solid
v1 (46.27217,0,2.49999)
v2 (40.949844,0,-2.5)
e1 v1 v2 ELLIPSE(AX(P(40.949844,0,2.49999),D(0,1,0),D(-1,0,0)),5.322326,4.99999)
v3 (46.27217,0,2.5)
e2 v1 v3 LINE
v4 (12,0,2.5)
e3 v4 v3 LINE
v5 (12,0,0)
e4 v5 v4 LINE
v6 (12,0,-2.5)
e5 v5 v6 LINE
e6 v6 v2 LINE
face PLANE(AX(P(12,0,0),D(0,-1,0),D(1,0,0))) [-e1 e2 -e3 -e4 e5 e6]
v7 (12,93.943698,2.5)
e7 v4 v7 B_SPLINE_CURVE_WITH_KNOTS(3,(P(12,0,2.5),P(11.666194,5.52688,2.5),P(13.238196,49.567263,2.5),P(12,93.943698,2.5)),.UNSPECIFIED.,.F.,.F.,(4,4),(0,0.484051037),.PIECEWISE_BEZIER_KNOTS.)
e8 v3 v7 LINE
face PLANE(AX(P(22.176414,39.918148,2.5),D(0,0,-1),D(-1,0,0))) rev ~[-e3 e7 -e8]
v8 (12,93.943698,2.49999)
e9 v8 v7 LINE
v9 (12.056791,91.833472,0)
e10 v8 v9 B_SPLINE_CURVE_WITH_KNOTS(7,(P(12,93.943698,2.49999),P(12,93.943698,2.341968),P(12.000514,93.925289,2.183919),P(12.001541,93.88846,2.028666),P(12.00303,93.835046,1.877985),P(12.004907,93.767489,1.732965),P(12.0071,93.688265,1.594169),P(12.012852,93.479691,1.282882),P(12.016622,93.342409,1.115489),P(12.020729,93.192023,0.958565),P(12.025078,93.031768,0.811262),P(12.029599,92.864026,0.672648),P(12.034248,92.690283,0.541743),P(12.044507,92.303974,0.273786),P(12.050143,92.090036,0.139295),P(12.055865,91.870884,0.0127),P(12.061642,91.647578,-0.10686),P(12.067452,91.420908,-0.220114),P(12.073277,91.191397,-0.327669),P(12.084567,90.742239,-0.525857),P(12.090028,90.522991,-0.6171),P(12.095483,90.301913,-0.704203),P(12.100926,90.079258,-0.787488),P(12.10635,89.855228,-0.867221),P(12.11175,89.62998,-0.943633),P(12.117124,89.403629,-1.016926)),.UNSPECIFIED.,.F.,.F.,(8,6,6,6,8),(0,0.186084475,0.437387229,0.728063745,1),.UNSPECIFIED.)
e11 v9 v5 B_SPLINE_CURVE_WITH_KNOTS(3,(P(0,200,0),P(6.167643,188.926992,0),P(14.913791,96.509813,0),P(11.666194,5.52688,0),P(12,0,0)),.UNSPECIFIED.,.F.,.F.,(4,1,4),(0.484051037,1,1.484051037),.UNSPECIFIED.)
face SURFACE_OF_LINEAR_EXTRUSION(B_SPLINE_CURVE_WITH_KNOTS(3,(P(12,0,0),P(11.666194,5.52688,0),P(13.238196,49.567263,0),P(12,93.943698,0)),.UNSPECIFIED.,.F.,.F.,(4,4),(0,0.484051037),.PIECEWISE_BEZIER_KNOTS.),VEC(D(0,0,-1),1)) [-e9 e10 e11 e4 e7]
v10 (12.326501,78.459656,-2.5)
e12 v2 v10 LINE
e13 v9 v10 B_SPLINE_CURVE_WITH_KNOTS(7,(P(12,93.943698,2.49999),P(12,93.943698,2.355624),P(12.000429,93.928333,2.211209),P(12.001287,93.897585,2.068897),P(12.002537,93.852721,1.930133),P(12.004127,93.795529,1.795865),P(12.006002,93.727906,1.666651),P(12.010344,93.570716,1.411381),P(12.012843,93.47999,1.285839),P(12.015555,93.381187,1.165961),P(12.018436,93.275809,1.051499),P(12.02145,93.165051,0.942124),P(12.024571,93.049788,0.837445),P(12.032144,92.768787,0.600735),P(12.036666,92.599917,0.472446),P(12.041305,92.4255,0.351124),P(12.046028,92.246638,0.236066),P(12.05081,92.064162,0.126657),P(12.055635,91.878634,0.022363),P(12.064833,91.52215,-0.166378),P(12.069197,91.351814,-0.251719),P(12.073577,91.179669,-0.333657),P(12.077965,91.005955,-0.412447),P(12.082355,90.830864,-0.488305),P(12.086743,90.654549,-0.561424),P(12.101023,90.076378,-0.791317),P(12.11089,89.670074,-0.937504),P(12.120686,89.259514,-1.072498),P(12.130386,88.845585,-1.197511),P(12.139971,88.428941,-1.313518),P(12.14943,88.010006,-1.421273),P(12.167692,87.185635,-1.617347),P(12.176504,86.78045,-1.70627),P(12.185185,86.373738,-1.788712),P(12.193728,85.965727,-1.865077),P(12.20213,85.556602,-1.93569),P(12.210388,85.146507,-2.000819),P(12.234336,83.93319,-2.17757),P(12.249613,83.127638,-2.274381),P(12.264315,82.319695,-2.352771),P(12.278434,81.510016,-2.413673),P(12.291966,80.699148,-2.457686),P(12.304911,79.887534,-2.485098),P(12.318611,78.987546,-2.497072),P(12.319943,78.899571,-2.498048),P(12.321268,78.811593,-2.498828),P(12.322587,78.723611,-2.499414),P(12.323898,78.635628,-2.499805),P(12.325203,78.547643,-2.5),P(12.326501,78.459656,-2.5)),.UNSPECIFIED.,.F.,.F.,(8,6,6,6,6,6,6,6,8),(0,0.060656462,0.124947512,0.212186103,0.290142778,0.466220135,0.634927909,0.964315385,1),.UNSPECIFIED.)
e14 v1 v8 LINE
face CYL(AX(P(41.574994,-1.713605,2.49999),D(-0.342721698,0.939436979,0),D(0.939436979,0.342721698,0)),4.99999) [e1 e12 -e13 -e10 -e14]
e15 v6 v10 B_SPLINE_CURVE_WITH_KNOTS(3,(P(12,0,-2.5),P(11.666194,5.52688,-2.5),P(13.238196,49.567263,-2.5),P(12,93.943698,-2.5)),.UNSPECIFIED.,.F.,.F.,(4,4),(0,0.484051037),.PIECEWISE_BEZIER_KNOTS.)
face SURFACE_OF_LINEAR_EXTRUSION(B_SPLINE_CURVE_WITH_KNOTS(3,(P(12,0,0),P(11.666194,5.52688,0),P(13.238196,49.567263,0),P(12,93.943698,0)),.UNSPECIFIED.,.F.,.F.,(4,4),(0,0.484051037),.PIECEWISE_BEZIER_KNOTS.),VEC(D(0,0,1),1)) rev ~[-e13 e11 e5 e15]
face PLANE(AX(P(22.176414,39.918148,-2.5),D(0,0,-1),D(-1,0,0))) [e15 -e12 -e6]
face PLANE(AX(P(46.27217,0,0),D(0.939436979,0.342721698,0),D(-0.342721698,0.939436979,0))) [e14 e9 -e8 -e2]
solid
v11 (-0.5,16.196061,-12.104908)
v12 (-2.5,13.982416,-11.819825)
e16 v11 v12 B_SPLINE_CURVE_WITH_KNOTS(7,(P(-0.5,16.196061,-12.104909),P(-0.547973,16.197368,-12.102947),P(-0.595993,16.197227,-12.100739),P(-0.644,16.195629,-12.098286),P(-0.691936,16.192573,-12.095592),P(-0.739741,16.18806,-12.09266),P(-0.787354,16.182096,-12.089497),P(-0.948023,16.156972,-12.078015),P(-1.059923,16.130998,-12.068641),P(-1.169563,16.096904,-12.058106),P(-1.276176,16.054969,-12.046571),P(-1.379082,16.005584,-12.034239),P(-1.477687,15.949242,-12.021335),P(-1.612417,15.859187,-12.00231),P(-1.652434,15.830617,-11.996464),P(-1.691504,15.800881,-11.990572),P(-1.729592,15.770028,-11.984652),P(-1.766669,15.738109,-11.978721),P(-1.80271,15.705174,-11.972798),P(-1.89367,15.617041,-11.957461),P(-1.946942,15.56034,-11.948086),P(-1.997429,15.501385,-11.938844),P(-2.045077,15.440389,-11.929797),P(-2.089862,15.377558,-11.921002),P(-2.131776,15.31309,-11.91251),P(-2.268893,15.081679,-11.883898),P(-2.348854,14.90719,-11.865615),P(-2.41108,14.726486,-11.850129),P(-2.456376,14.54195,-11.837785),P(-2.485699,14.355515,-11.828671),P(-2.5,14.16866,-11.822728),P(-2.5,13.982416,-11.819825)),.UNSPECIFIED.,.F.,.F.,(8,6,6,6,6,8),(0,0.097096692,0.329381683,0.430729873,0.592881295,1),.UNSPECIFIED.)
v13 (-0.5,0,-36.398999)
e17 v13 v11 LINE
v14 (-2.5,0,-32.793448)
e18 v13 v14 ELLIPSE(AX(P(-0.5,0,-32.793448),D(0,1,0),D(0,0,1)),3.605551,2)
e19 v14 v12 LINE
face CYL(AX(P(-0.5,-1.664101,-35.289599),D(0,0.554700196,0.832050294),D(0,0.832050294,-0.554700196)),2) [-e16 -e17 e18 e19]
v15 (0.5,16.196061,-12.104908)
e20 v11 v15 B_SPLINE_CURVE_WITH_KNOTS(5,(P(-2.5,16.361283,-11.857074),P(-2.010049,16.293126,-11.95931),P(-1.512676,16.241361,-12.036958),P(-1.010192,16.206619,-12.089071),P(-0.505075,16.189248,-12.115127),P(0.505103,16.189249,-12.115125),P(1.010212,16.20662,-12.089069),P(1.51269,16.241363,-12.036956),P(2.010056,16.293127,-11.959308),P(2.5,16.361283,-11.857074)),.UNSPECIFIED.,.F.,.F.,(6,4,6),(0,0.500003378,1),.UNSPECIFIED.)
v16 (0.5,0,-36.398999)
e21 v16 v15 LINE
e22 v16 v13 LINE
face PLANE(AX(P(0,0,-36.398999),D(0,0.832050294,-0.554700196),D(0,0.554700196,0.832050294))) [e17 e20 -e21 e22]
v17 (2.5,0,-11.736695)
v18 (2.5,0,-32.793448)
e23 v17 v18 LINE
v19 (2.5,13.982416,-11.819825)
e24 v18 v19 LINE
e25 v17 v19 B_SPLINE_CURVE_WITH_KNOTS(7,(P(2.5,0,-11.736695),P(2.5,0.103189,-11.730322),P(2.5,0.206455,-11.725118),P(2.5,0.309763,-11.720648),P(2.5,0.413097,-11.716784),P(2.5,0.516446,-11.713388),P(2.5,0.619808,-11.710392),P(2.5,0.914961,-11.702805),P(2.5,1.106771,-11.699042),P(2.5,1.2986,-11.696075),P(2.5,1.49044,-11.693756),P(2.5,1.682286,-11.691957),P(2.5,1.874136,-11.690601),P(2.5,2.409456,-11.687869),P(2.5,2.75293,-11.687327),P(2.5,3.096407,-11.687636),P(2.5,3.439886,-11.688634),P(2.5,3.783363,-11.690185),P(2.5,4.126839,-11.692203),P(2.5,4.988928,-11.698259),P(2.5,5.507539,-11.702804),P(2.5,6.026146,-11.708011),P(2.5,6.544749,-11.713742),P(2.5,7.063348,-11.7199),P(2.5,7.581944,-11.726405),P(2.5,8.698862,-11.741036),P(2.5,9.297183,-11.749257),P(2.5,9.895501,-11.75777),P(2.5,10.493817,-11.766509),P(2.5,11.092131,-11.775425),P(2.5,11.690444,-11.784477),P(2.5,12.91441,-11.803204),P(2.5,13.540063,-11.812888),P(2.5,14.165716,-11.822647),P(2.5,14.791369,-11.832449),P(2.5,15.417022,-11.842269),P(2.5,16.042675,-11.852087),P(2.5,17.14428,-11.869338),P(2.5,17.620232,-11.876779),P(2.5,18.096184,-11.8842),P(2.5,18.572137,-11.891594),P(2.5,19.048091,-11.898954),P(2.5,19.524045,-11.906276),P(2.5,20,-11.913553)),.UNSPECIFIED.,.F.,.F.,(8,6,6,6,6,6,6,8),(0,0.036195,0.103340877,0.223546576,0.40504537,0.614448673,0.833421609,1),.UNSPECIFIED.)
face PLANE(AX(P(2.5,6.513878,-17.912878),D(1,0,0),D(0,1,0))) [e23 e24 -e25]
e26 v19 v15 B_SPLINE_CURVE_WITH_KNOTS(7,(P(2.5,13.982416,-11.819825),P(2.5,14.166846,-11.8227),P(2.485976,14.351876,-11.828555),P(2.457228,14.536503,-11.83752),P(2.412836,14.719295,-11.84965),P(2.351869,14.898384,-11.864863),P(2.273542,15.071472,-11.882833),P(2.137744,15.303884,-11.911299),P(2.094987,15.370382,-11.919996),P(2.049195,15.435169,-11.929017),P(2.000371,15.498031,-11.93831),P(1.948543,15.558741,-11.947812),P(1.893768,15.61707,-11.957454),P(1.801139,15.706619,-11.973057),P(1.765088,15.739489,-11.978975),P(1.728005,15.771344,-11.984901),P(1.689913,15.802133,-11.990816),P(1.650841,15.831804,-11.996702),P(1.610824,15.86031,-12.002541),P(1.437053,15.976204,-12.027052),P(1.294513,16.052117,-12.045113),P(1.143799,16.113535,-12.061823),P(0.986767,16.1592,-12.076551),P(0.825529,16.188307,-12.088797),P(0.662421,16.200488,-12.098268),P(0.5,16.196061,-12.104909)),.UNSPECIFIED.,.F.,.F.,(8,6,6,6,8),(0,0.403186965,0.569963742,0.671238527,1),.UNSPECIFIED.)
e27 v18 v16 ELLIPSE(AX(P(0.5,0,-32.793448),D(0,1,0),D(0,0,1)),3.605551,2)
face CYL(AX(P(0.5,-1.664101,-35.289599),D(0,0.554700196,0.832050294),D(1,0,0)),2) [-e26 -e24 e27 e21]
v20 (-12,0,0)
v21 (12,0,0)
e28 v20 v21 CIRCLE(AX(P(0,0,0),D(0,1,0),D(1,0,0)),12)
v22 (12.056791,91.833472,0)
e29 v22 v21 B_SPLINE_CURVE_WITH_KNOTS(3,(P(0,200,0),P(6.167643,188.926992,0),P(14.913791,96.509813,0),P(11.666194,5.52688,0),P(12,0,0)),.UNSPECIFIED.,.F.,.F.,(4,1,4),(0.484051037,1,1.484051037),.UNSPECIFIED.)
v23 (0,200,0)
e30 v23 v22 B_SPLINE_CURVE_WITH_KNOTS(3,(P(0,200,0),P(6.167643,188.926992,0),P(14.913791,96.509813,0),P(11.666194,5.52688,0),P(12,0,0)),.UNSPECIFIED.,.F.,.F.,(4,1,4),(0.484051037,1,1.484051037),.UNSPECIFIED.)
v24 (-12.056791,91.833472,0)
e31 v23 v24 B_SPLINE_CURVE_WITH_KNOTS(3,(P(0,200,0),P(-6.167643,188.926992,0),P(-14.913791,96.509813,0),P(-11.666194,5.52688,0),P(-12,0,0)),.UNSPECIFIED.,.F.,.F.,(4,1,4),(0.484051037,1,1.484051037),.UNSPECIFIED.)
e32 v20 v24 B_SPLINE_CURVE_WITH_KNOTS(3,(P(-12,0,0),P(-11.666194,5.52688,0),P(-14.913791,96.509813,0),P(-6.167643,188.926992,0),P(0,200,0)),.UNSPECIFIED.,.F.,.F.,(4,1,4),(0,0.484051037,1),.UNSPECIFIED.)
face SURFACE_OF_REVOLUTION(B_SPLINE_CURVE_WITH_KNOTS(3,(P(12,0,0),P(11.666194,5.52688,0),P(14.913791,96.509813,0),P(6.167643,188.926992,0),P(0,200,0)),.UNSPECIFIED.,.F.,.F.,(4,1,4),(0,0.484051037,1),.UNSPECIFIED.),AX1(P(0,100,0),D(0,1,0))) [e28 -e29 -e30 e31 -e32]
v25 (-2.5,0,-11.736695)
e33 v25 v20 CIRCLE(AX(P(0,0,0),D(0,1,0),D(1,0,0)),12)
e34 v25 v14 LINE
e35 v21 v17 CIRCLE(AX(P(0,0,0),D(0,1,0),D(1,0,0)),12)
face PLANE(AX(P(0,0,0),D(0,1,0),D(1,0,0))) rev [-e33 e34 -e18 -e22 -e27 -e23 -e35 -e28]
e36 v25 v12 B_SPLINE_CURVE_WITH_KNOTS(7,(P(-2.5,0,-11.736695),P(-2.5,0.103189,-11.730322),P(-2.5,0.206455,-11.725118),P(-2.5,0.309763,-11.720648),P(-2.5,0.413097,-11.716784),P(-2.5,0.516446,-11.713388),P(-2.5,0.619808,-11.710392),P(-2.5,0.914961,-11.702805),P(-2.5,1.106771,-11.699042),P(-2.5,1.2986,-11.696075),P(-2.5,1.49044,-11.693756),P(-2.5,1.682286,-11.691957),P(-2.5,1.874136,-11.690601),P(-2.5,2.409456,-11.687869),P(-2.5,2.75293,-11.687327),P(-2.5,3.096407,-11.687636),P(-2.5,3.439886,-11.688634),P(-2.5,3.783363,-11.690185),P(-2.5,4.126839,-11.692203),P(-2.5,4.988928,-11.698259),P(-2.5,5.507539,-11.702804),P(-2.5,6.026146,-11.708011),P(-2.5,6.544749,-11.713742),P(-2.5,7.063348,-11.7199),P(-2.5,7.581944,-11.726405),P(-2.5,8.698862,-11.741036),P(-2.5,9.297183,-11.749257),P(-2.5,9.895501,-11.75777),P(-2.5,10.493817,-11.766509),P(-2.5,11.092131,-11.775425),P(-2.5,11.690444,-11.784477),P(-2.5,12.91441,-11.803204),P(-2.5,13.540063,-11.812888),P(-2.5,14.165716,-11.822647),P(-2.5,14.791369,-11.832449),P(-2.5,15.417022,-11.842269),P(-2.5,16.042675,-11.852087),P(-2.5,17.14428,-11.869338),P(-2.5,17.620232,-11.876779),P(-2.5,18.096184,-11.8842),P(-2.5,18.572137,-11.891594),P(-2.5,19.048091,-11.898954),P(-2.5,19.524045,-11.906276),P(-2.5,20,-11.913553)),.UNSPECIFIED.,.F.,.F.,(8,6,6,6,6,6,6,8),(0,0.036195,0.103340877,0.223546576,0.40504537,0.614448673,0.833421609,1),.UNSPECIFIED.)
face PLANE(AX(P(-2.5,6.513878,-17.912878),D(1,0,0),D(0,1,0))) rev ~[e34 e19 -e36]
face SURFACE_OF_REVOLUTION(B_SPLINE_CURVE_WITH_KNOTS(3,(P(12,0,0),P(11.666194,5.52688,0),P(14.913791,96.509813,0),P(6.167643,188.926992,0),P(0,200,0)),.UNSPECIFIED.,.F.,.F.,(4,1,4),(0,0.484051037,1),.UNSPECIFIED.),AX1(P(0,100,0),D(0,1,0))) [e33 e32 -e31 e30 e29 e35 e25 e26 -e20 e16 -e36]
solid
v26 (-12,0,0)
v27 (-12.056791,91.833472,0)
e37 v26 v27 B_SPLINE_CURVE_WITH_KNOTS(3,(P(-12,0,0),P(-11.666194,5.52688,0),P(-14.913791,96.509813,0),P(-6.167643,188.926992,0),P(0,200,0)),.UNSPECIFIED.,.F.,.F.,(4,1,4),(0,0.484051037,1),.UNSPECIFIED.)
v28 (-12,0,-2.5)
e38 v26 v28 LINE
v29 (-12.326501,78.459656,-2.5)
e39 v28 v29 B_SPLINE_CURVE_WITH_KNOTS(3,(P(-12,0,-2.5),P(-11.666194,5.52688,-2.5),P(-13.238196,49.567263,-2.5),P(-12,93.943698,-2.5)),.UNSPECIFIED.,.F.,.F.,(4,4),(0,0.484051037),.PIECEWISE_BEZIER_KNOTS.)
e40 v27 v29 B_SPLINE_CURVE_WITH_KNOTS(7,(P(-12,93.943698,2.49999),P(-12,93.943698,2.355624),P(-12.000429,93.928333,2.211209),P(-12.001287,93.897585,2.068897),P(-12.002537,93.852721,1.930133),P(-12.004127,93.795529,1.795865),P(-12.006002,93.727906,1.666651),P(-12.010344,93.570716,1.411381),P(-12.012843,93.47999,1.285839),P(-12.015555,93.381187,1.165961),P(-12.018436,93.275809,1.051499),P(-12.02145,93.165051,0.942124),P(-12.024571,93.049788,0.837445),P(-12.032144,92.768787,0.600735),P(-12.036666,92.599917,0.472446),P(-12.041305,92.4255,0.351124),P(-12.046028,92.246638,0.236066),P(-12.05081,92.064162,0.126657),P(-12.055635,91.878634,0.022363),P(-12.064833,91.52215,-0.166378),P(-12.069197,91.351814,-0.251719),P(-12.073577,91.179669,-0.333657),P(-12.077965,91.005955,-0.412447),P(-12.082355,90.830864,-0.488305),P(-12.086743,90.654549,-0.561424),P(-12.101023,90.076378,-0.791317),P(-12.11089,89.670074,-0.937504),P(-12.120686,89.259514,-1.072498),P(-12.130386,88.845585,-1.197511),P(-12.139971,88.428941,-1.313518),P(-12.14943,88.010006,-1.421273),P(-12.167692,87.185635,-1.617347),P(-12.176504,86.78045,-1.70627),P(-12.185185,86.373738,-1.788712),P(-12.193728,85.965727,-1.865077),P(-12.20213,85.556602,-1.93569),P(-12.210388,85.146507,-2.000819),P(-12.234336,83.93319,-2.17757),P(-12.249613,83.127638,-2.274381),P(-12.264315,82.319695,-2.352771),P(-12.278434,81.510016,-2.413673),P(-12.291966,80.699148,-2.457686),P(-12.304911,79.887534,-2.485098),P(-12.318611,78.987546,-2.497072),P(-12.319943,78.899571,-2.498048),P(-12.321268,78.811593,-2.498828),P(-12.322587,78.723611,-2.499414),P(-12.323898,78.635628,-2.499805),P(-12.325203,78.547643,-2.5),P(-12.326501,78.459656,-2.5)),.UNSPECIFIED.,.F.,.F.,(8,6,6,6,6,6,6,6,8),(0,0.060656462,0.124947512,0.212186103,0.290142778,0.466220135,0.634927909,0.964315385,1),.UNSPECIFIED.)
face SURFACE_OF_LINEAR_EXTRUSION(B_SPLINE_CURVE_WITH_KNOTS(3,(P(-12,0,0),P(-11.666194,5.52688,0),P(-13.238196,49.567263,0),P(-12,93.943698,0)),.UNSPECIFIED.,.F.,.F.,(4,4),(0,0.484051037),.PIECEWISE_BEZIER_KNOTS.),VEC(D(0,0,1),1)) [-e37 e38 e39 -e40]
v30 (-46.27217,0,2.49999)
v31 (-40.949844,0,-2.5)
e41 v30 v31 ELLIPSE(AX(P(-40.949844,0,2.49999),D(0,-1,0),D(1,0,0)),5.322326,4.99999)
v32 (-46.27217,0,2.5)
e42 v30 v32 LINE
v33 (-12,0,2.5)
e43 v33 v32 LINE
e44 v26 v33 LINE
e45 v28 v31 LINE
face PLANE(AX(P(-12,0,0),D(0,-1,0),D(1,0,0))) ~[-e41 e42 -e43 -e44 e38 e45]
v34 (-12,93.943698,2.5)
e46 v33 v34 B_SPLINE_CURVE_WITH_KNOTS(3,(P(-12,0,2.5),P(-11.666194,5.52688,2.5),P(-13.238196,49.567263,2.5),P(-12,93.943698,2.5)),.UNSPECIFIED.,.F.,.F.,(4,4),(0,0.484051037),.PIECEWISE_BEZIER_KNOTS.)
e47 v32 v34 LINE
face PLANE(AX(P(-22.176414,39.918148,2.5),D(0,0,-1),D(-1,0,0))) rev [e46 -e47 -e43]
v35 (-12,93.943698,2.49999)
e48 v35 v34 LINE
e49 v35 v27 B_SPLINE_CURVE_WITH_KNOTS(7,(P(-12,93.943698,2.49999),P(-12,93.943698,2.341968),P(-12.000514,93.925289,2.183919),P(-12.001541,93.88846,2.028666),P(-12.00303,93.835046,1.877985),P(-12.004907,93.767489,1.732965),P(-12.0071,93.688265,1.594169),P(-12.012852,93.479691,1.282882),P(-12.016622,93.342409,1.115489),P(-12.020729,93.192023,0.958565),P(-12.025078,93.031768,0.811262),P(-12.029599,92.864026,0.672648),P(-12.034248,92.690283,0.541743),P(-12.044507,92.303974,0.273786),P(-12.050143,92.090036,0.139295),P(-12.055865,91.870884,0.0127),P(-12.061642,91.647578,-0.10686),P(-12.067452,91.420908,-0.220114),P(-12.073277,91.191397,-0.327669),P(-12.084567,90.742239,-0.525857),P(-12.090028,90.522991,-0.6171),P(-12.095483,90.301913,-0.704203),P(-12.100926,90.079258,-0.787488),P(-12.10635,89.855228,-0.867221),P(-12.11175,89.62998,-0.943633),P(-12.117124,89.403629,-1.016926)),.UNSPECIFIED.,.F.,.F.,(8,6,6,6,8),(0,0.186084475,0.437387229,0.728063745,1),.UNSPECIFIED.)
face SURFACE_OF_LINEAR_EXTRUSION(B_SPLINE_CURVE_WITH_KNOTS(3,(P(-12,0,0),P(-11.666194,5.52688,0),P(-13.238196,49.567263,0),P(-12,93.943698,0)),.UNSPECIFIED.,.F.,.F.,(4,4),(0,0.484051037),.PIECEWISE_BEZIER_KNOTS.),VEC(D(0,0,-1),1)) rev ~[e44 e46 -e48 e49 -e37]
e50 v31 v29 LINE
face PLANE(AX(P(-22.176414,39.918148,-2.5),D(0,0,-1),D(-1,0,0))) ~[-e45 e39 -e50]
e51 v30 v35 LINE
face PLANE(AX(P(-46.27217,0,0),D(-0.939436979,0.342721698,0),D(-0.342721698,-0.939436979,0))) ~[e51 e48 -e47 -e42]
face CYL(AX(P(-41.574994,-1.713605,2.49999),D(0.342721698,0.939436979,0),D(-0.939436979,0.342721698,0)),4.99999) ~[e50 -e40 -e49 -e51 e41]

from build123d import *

# Parameters (mm, degrees)
F2_DEPTH = 2.5
F3_R     = 4.99999
F6_DEPTH = 2.5
F7_R     = 2
F8_R     = 2


# Not quite as in the source:
# - a fillet or chamfer is up to 0.001 mm smaller than in the source, because OpenCascade refuses the exact size


with BuildPart() as f1:
    # F0 (on Top) → F1 (revolve)
    with BuildSketch(Plane.XY):
        with BuildLine():
            Line((0, 200), (0, 0))
            Line((0, 0), (12, 0))
            add(Edge.make_bspline(
                [(12, 0), (11.666193583, 5.5268802411), (13.2381964863, 49.5672633882), (12, 93.9436979115)],
                knots=[0, 0, 0, 0, 0.484051037, 0.484051037, 0.484051037, 0.484051037], degree=3))
            add(Edge.make_bspline(
                [(12, 93.9436979115), (10.6802090187, 141.2444443711), (6.1676430445, 188.9269916502), (0, 200)],
                knots=[0.484051037, 0.484051037, 0.484051037, 0.484051037, 1, 1, 1, 1], degree=3))
        make_face()
    revolve(axis=Axis((0, 100, 0), (0, 1, 0)))

    # F0 (on Top) → F2 (join, symmetric)
    with BuildSketch(Plane.XY):
        with BuildLine():
            add(Edge.make_bspline(
                [(12, 0), (11.666193583, 5.5268802411), (13.2381964863, 49.5672633882), (12, 93.9436979115)],
                knots=[0, 0, 0, 0, 0.484051037, 0.484051037, 0.484051037, 0.484051037], degree=3))
            Line((12, 0), (46.2721697986, 0))
            Line((46.2721697986, 0), (12, 93.9436979115))
        make_face()
    extrude(amount=F2_DEPTH, both=True)

    # F3 (radius 5 in the source; OpenCascade refuses exactly that, so slightly less here)
    f3_edges = [f1.edges().sort_by_distance(p)[0] for p in [
        (29.136085, 46.971849, -2.5),
    ]]
    fillet(f3_edges, radius=F3_R)

    # F4: F1 across plane


with BuildPart() as f1_1:
    add(f1.part)
    add(f1.part.mirror(Plane.YZ))

    # F5 (on Right) → F6 (join, symmetric)
    with BuildSketch(Plane.YZ):
        Polygon((20, -6.398999393), (0, -6.398999393), (0, -36.398999393), align=None)
    extrude(amount=F6_DEPTH, both=True)

    # F7
    f7_edges = [f1_1.edges().sort_by_distance(p)[0] for p in [
        (2.5, 8.180642, -24.128037),
    ]]
    fillet(f7_edges, radius=F7_R)

    # F8
    f8_edges = [f1_1.edges().sort_by_distance(p)[0] for p in [
        (-2.5, 8.180642, -24.128037),
    ]]
    fillet(f8_edges, radius=F8_R)


solid = f1_1.part
